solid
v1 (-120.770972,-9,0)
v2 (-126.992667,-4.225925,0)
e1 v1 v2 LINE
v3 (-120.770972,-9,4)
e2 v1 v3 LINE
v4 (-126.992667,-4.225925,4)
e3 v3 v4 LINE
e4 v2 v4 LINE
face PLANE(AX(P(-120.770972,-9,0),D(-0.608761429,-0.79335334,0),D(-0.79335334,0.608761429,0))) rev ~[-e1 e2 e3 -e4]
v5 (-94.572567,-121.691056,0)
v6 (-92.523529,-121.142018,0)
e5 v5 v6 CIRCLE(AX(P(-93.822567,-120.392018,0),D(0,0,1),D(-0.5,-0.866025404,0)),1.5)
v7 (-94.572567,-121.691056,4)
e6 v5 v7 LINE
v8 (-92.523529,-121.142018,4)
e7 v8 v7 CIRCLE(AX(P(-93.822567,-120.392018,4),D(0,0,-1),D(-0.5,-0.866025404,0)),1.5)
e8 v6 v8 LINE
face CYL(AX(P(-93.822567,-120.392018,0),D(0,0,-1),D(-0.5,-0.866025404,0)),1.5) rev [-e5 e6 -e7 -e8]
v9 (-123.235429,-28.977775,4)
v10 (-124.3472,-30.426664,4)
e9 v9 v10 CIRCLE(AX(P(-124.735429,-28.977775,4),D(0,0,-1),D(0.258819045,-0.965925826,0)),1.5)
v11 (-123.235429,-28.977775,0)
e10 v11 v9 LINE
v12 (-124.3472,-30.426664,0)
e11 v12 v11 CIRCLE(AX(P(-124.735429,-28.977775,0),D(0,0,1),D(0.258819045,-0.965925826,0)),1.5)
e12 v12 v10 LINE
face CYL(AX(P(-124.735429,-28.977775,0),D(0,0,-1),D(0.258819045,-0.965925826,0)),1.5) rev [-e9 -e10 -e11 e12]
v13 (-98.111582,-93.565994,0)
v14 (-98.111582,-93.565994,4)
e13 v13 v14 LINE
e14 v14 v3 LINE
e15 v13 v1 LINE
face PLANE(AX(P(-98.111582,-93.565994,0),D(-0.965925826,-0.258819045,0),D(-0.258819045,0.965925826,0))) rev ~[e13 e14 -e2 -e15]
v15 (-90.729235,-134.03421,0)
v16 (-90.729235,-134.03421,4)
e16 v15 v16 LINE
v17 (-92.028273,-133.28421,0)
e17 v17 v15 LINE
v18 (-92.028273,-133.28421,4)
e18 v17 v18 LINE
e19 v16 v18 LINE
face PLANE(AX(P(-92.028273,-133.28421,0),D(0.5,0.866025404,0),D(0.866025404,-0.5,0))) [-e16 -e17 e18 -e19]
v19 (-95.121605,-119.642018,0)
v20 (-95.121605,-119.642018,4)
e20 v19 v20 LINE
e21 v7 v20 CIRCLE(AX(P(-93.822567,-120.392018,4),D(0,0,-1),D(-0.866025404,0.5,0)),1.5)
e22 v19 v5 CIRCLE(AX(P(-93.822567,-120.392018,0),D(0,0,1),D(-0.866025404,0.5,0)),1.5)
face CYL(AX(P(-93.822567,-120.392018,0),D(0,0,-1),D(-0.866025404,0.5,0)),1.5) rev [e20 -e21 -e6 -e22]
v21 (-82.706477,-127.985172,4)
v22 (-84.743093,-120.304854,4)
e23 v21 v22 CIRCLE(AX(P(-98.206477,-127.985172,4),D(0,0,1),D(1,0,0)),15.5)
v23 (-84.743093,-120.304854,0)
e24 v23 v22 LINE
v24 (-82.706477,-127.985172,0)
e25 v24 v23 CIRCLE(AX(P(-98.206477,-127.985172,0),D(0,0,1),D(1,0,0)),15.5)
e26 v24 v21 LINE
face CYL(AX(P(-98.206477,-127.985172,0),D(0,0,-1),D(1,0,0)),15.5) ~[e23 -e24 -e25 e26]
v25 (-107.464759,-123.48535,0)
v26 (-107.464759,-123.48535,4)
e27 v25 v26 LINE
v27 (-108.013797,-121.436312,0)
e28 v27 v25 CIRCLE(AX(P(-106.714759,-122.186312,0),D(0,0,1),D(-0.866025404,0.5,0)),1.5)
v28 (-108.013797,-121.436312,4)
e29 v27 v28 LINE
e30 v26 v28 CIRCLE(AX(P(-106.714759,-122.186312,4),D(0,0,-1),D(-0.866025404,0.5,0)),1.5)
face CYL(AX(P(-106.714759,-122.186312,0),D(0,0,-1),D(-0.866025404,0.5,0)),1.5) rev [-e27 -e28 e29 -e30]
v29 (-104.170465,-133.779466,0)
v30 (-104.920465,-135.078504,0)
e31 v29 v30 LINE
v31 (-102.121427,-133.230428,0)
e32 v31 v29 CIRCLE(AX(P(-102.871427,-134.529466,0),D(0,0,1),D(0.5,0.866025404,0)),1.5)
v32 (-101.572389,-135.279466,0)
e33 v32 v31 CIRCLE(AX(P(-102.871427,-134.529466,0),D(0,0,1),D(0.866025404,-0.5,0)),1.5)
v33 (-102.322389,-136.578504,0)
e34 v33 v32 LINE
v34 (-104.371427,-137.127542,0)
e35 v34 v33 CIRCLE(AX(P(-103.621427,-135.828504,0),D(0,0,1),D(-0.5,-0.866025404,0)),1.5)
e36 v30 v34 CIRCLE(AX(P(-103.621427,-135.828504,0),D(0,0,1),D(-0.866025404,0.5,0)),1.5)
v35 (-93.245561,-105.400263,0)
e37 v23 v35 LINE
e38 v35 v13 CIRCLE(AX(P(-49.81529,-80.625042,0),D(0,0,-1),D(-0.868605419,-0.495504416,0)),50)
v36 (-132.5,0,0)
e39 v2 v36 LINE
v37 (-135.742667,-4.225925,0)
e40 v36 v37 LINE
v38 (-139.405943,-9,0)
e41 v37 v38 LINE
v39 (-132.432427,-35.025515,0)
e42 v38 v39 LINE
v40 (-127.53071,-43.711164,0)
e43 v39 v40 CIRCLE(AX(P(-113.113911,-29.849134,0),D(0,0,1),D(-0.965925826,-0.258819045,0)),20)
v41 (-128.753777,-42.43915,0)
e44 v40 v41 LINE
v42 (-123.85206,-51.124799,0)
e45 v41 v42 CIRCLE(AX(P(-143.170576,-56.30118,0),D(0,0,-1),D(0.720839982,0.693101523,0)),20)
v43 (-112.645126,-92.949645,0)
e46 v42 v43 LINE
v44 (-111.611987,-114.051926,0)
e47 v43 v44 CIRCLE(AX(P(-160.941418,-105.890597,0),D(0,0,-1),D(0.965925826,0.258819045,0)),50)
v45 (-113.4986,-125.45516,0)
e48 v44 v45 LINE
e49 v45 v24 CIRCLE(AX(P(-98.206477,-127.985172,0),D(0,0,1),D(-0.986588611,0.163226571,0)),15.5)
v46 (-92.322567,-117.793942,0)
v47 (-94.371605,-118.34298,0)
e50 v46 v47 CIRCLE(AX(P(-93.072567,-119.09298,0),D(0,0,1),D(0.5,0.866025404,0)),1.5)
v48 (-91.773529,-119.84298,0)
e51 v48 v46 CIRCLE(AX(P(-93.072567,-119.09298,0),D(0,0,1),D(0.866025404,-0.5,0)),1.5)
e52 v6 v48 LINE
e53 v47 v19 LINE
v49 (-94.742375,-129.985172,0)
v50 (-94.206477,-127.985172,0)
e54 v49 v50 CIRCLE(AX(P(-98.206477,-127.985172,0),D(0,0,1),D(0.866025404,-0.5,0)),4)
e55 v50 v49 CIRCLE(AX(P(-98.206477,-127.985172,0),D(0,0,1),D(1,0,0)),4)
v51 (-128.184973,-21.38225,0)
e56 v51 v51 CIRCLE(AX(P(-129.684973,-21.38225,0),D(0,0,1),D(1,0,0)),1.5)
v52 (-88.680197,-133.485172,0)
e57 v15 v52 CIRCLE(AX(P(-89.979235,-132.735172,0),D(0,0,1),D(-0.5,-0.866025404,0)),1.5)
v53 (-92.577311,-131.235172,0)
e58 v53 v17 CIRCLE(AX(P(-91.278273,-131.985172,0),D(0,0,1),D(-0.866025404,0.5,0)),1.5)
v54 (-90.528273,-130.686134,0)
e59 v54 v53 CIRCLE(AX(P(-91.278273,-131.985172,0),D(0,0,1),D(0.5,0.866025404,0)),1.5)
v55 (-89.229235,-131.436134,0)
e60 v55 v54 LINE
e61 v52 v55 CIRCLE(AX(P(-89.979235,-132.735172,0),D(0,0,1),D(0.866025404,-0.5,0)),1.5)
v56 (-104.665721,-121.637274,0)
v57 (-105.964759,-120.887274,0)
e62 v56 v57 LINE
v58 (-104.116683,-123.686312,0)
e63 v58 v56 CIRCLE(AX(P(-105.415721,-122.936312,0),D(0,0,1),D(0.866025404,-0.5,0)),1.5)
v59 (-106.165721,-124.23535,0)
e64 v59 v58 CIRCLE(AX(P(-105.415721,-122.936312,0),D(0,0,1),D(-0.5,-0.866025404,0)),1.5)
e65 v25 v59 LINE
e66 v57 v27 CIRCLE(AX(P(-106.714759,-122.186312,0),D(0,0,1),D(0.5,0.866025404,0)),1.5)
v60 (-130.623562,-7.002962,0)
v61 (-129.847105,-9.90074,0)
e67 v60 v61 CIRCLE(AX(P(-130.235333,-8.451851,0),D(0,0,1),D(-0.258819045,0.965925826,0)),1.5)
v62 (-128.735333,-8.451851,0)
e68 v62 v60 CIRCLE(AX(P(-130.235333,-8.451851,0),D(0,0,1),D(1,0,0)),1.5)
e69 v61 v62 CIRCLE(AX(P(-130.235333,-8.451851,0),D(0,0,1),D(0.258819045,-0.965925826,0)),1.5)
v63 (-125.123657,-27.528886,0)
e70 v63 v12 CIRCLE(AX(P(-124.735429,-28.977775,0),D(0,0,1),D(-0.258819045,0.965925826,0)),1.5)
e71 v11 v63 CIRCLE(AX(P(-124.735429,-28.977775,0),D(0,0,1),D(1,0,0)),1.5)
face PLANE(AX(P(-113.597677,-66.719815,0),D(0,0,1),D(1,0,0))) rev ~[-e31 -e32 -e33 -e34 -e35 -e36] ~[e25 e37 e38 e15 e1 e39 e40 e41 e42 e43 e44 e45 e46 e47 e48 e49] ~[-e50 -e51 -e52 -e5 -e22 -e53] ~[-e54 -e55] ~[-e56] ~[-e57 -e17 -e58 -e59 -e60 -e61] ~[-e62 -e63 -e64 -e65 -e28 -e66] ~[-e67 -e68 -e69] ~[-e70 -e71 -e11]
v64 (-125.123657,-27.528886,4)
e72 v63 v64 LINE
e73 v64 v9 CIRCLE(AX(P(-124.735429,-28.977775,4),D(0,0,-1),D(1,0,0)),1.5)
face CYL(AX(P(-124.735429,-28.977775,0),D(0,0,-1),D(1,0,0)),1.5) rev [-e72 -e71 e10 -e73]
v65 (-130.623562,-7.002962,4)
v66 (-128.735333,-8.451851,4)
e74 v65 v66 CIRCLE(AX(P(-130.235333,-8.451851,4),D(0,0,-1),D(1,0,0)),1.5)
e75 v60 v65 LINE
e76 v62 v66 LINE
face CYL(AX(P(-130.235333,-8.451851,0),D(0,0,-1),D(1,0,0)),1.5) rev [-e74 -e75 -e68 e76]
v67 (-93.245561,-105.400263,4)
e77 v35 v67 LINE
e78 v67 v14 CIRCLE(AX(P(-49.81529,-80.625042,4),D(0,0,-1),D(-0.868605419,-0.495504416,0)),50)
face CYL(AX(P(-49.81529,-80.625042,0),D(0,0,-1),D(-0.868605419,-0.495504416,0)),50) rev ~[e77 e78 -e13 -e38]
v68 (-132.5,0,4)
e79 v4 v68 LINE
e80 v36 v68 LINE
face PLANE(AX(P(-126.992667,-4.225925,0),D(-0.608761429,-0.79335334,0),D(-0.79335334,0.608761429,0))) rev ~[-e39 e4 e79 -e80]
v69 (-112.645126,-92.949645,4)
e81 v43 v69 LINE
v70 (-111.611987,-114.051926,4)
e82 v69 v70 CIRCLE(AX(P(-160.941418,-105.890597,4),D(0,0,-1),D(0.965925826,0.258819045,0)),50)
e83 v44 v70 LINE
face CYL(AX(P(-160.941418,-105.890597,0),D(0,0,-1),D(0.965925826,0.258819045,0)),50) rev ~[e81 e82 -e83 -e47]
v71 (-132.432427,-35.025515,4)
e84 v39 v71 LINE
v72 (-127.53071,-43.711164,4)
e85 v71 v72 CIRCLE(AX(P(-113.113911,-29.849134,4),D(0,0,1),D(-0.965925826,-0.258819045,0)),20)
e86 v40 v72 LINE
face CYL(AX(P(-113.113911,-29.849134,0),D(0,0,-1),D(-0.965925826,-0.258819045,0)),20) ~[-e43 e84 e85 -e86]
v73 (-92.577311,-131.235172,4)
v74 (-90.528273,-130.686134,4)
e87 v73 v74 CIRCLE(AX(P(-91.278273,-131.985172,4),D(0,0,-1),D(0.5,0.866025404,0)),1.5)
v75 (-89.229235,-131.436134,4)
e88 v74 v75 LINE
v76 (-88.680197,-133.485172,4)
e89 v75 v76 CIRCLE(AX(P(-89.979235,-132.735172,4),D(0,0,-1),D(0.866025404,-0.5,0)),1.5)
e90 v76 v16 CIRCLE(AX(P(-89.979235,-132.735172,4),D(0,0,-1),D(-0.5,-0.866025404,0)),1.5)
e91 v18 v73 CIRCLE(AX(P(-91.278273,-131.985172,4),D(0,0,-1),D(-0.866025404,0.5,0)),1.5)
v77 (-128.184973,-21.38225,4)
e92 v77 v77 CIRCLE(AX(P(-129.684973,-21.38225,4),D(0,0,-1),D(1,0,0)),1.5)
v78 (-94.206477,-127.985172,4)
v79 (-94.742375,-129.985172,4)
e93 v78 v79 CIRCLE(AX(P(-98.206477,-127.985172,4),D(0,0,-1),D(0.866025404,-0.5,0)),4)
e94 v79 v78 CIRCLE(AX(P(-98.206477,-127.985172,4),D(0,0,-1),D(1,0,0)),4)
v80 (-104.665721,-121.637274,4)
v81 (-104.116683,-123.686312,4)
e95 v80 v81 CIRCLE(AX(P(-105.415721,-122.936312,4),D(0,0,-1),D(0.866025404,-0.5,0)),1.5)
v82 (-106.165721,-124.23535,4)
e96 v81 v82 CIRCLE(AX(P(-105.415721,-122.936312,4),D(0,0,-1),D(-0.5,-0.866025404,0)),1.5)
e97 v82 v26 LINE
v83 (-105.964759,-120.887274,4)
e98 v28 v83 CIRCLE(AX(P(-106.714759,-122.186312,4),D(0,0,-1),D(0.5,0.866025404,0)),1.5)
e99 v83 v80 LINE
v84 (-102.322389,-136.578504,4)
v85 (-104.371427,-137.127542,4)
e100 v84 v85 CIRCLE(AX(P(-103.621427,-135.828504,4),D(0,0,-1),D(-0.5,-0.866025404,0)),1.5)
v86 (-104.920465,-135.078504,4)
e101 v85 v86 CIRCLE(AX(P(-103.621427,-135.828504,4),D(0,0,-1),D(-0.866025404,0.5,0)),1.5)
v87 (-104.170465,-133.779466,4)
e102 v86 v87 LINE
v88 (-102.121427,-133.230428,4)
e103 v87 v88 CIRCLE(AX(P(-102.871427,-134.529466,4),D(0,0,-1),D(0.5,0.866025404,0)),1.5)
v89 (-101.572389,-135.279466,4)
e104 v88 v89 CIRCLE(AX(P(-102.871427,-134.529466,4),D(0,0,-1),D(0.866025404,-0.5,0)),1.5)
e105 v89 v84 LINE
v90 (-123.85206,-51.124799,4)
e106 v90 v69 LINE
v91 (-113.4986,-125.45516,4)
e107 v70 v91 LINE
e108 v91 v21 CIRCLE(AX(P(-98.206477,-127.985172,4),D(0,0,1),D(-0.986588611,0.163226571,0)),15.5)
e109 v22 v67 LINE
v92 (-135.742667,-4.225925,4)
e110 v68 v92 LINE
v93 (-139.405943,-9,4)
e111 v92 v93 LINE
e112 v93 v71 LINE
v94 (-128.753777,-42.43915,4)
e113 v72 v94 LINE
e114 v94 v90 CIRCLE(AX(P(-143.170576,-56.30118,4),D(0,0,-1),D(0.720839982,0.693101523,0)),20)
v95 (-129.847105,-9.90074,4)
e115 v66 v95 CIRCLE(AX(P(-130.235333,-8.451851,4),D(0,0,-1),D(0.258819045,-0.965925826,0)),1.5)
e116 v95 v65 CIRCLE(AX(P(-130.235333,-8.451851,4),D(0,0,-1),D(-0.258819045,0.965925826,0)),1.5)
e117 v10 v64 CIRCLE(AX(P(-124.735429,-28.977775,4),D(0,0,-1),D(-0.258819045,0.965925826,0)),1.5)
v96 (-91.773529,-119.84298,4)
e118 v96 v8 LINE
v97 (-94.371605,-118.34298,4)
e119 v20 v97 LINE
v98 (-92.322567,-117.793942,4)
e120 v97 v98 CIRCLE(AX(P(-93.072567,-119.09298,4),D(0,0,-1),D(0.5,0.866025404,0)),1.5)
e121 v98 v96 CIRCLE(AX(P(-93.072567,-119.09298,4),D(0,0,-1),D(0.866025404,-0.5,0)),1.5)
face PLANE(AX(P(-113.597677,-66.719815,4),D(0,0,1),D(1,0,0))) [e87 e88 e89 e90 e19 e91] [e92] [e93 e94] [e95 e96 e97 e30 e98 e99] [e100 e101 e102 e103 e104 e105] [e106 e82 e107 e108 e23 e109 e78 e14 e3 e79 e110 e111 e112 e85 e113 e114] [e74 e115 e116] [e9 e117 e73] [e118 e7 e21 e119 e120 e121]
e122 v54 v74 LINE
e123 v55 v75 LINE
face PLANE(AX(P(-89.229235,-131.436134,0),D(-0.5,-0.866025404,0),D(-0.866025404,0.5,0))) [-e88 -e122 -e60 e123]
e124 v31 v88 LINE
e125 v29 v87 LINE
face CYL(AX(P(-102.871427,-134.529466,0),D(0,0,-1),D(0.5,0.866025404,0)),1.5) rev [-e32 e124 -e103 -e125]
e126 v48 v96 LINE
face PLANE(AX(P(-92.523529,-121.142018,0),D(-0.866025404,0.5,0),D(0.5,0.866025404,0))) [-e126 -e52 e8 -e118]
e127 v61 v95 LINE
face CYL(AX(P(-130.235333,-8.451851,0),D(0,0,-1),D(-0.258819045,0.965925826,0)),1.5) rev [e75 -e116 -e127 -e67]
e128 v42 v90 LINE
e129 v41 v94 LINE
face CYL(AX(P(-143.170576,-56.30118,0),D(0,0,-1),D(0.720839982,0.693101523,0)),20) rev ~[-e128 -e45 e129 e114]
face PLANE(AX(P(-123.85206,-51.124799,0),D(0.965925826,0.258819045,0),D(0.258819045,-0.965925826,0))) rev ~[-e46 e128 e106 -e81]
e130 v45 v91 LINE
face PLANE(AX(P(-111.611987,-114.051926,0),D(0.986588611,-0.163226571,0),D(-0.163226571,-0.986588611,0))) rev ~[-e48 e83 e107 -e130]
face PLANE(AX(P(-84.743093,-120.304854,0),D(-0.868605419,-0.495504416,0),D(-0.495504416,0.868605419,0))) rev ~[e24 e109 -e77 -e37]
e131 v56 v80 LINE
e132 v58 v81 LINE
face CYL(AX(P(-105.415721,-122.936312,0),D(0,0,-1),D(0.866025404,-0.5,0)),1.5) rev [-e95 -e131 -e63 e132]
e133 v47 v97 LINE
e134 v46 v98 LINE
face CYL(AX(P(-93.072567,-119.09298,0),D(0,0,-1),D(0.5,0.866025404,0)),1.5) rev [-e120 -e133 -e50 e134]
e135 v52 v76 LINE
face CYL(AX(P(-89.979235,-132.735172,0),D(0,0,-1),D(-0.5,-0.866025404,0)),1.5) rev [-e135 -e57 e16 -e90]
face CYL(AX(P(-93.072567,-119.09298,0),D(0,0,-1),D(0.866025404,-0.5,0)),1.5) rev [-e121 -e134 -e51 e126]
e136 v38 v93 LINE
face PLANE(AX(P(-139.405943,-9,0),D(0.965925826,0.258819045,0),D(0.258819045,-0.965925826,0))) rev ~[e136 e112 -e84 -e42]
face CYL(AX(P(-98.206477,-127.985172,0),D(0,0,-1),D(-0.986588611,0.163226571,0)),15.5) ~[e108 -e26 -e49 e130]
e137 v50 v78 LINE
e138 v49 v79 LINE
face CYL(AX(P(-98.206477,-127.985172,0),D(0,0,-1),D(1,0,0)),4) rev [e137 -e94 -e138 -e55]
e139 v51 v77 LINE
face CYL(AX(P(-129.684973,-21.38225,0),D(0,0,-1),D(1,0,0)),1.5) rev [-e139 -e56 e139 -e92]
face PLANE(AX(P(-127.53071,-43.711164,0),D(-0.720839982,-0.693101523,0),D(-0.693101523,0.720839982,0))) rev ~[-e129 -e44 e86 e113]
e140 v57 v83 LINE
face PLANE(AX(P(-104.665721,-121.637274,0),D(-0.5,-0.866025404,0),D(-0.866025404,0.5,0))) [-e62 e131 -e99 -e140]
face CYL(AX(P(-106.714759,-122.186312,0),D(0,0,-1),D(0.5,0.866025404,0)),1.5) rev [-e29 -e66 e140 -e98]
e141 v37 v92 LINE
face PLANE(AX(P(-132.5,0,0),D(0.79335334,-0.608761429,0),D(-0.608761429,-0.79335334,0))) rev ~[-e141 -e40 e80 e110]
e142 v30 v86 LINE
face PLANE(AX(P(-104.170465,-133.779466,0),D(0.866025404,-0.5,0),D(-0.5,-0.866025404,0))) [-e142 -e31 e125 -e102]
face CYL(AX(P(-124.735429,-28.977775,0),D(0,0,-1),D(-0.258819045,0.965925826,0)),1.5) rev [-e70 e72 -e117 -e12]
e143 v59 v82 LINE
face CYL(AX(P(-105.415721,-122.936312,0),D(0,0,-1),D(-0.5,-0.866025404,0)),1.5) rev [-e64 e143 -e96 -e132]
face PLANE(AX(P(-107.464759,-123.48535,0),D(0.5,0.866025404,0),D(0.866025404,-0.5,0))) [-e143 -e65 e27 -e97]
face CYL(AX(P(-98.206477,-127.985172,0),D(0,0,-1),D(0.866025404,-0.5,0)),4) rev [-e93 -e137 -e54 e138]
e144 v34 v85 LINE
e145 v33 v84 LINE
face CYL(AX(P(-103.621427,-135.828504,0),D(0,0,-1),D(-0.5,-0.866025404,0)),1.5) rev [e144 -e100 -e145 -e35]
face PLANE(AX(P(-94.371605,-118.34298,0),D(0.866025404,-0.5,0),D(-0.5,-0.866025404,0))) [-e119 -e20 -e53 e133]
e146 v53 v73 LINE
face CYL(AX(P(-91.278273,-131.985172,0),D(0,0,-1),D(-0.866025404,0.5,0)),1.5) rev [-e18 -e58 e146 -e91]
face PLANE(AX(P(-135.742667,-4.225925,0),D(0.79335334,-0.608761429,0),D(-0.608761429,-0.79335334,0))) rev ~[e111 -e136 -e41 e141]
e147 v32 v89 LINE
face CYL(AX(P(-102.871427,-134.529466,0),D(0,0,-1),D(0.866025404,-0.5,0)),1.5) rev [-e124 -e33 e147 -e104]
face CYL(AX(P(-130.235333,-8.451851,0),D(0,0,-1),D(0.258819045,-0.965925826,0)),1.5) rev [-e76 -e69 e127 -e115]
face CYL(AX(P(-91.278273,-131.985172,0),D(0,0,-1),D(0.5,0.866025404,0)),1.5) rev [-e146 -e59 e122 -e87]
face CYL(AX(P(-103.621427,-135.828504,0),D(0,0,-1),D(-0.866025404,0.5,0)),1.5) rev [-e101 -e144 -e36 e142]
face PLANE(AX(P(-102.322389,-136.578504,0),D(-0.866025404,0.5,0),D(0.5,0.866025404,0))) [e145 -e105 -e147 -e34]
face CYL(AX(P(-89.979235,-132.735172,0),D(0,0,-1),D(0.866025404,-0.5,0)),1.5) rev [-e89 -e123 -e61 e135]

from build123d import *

# Parameters (mm, degrees)
F4_DEPTH = 4
F2_R     = 1.5
F5_DEPTH = 25


with BuildPart() as f4:
    # F3 (on Top) → F4 (new body)
    with BuildSketch(Plane.XY):
        with BuildLine():
            Line((-126.9926666777, -4.22592549), (-132.5, 0))
            Line((-132.5, 0), (-135.7426666777, -4.22592549))
            Line((-135.7426666777, -4.22592549), (-139.4059428918, -9))
            Line((-139.4059428918, -9), (-132.4324272279, -35.0255147652))
            ThreePointArc((-132.4324272279, -35.0255147652), (-130.5316607318, -39.6787820716), (-127.530710333, -43.7111643205))
            Line((-127.530710333, -43.7111643205), (-128.7537766971, -42.4391498951))
            ThreePointArc((-128.7537766971, -42.4391498951), (-125.7528262983, -46.4715321441), (-123.8520598023, -51.1247994505))
            Line((-123.8520598023, -51.1247994505), (-112.6451262464, -92.9496448783))
            ThreePointArc((-112.6451262464, -92.9496448783), (-111.0012337894, -103.4455930684), (-111.6119870301, -114.0519256721))
            Line((-111.6119870301, -114.0519256721), (-113.4985999884, -125.4551601363))
            ThreePointArc((-113.4985999884, -125.4551601363), (-100.9391467421, -112.7279601319), (-84.7430925287, -120.3048535396))
            Line((-84.7430925287, -120.3048535396), (-93.2455614317, -105.4002627224))
            ThreePointArc((-93.2455614317, -105.4002627224), (-96.0587011908, -99.6394303241), (-98.1115817937, -93.5659941915))
            Line((-98.1115817937, -93.5659941915), (-120.7709716444, -9))
            Line((-120.7709716444, -9), (-126.9926666777, -4.22592549))
        make_face()
        with BuildLine():
            ThreePointArc((-82.7064765239, -127.9851719833), (-83.2242795567, -124.0122921667), (-84.7430925287, -120.3048535396))
            ThreePointArc((-84.7430925287, -120.3048535396), (-100.9391467421, -112.7279601319), (-113.4985999884, -125.4551601363))
            ThreePointArc((-113.4985999884, -125.4551601363), (-99.4757452701, -143.4331154338), (-82.7064765239, -127.9851719833))
        make_face()
    extrude(amount=F4_DEPTH)

    # F0 (on Top) + F1 (on Top) + F2 (on Top) → F5 (cut)
    with BuildSketch(Plane.XY):
        with BuildLine():
            ThreePointArc((-101.5723892492, -135.2794656723), (-101.4225386155, -134.1412371047), (-102.1214273549, -133.2304275666))
            ThreePointArc((-102.1214273549, -133.2304275666), (-103.2596559226, -133.0805769329), (-104.1704654606, -133.7794656723))
            Line((-104.1704654606, -133.7794656723), (-104.9204654606, -135.078503778))
            ThreePointArc((-104.9204654606, -135.078503778), (-105.0703160943, -136.2167323456), (-104.3714273549, -137.1275418837))
            ThreePointArc((-104.3714273549, -137.1275418837), (-103.2331987872, -137.2773925174), (-102.3223892492, -136.578503778))
            Line((-102.3223892492, -136.578503778), (-101.5723892492, -135.2794656723))
        make_face()
        with BuildLine():
            ThreePointArc((-94.7423749088, -129.9851719833), (-94.3427732188, -129.0204481637), (-94.2064765239, -127.9851719833))
            ThreePointArc((-94.2064765239, -127.9851719833), (-102.0701798291, -126.9498958029), (-94.7423749088, -129.9851719833))
        make_face()
        with BuildLine():
            Line((-107.4647591496, -123.4853497167), (-106.1657210439, -124.2353497167))
            ThreePointArc((-106.1657210439, -124.2353497167), (-105.0274924763, -124.3852003505), (-104.1166829382, -123.6863116111))
            ThreePointArc((-104.1166829382, -123.6863116111), (-103.9668323045, -122.5480830434), (-104.6657210439, -121.6372735054))
            Line((-104.6657210439, -121.6372735054), (-105.9647591496, -120.8872735054))
            ThreePointArc((-105.9647591496, -120.8872735054), (-107.1029877172, -120.7374228716), (-108.0137972553, -121.4363116111))
            ThreePointArc((-108.0137972553, -121.4363116111), (-108.163647889, -122.5745401787), (-107.4647591496, -123.4853497167))
        make_face()
        with BuildLine():
            Line((-92.523528877, -121.142017922), (-91.773528877, -119.8429798164))
            ThreePointArc((-91.773528877, -119.8429798164), (-91.6236782432, -118.7047512487), (-92.3225669827, -117.7939417107))
            ThreePointArc((-92.3225669827, -117.7939417107), (-93.4607955503, -117.6440910769), (-94.3716050883, -118.3429798164))
            Line((-94.3716050883, -118.3429798164), (-95.1216050883, -119.642017922))
            ThreePointArc((-95.1216050883, -119.642017922), (-95.2714557221, -120.7802464897), (-94.5725669827, -121.6910560277))
            ThreePointArc((-94.5725669827, -121.6910560277), (-93.434338415, -121.8409066615), (-92.523528877, -121.142017922))
        make_face()
        with BuildLine():
            ThreePointArc((-90.5282732936, -130.6861338776), (-91.6665018613, -130.5362832439), (-92.5773113993, -131.2351719833))
            ThreePointArc((-92.5773113993, -131.2351719833), (-92.7271620331, -132.373400551), (-92.0282732936, -133.284210089))
            Line((-92.0282732936, -133.284210089), (-90.729235188, -134.034210089))
            ThreePointArc((-90.729235188, -134.034210089), (-89.5910066203, -134.1840607227), (-88.6801970823, -133.4851719833))
            ThreePointArc((-88.6801970823, -133.4851719833), (-88.5303464485, -132.3469434156), (-89.229235188, -131.4361338776))
            Line((-89.229235188, -131.4361338776), (-90.5282732936, -130.6861338776))
        make_face()
    with BuildSketch(Plane.XY):
        with BuildLine():
            ThreePointArc((-123.2354286469, -28.9777747887), (-123.8222865034, -27.7877447782), (-125.1236572146, -27.5288860492))
            Line((-125.1236572146, -27.5288860492), (-124.3472000793, -30.4266635281))
            ThreePointArc((-124.3472000793, -30.4266635281), (-123.5453986365, -29.8909169322), (-123.2354286469, -28.9777747887))
        make_face()
        with BuildLine():
            Line((-124.3472000793, -30.4266635281), (-125.1236572146, -27.5288860492))
            ThreePointArc((-125.1236572146, -27.5288860492), (-126.1843173864, -29.3660033563), (-124.3472000793, -30.4266635281))
        make_face()
        with BuildLine():
            ThreePointArc((-128.7353333554, -8.45185098), (-129.3221912118, -7.2618209696), (-130.623561923, -7.0029622406))
            Line((-130.623561923, -7.0029622406), (-129.8471047877, -9.9007397195))
            ThreePointArc((-129.8471047877, -9.9007397195), (-129.0453033449, -9.3649931235), (-128.7353333554, -8.45185098))
        make_face()
        with BuildLine():
            Line((-129.8471047877, -9.9007397195), (-130.623561923, -7.0029622406))
            ThreePointArc((-130.623561923, -7.0029622406), (-131.6842220948, -8.8400795477), (-129.8471047877, -9.9007397195))
        make_face()
    with BuildSketch(Plane.XY):
        with Locations((-129.6849733529, -21.3822502318)):
            Circle(F2_R)
    extrude(amount=F5_DEPTH, mode=Mode.SUBTRACT)


solid = f4.part
